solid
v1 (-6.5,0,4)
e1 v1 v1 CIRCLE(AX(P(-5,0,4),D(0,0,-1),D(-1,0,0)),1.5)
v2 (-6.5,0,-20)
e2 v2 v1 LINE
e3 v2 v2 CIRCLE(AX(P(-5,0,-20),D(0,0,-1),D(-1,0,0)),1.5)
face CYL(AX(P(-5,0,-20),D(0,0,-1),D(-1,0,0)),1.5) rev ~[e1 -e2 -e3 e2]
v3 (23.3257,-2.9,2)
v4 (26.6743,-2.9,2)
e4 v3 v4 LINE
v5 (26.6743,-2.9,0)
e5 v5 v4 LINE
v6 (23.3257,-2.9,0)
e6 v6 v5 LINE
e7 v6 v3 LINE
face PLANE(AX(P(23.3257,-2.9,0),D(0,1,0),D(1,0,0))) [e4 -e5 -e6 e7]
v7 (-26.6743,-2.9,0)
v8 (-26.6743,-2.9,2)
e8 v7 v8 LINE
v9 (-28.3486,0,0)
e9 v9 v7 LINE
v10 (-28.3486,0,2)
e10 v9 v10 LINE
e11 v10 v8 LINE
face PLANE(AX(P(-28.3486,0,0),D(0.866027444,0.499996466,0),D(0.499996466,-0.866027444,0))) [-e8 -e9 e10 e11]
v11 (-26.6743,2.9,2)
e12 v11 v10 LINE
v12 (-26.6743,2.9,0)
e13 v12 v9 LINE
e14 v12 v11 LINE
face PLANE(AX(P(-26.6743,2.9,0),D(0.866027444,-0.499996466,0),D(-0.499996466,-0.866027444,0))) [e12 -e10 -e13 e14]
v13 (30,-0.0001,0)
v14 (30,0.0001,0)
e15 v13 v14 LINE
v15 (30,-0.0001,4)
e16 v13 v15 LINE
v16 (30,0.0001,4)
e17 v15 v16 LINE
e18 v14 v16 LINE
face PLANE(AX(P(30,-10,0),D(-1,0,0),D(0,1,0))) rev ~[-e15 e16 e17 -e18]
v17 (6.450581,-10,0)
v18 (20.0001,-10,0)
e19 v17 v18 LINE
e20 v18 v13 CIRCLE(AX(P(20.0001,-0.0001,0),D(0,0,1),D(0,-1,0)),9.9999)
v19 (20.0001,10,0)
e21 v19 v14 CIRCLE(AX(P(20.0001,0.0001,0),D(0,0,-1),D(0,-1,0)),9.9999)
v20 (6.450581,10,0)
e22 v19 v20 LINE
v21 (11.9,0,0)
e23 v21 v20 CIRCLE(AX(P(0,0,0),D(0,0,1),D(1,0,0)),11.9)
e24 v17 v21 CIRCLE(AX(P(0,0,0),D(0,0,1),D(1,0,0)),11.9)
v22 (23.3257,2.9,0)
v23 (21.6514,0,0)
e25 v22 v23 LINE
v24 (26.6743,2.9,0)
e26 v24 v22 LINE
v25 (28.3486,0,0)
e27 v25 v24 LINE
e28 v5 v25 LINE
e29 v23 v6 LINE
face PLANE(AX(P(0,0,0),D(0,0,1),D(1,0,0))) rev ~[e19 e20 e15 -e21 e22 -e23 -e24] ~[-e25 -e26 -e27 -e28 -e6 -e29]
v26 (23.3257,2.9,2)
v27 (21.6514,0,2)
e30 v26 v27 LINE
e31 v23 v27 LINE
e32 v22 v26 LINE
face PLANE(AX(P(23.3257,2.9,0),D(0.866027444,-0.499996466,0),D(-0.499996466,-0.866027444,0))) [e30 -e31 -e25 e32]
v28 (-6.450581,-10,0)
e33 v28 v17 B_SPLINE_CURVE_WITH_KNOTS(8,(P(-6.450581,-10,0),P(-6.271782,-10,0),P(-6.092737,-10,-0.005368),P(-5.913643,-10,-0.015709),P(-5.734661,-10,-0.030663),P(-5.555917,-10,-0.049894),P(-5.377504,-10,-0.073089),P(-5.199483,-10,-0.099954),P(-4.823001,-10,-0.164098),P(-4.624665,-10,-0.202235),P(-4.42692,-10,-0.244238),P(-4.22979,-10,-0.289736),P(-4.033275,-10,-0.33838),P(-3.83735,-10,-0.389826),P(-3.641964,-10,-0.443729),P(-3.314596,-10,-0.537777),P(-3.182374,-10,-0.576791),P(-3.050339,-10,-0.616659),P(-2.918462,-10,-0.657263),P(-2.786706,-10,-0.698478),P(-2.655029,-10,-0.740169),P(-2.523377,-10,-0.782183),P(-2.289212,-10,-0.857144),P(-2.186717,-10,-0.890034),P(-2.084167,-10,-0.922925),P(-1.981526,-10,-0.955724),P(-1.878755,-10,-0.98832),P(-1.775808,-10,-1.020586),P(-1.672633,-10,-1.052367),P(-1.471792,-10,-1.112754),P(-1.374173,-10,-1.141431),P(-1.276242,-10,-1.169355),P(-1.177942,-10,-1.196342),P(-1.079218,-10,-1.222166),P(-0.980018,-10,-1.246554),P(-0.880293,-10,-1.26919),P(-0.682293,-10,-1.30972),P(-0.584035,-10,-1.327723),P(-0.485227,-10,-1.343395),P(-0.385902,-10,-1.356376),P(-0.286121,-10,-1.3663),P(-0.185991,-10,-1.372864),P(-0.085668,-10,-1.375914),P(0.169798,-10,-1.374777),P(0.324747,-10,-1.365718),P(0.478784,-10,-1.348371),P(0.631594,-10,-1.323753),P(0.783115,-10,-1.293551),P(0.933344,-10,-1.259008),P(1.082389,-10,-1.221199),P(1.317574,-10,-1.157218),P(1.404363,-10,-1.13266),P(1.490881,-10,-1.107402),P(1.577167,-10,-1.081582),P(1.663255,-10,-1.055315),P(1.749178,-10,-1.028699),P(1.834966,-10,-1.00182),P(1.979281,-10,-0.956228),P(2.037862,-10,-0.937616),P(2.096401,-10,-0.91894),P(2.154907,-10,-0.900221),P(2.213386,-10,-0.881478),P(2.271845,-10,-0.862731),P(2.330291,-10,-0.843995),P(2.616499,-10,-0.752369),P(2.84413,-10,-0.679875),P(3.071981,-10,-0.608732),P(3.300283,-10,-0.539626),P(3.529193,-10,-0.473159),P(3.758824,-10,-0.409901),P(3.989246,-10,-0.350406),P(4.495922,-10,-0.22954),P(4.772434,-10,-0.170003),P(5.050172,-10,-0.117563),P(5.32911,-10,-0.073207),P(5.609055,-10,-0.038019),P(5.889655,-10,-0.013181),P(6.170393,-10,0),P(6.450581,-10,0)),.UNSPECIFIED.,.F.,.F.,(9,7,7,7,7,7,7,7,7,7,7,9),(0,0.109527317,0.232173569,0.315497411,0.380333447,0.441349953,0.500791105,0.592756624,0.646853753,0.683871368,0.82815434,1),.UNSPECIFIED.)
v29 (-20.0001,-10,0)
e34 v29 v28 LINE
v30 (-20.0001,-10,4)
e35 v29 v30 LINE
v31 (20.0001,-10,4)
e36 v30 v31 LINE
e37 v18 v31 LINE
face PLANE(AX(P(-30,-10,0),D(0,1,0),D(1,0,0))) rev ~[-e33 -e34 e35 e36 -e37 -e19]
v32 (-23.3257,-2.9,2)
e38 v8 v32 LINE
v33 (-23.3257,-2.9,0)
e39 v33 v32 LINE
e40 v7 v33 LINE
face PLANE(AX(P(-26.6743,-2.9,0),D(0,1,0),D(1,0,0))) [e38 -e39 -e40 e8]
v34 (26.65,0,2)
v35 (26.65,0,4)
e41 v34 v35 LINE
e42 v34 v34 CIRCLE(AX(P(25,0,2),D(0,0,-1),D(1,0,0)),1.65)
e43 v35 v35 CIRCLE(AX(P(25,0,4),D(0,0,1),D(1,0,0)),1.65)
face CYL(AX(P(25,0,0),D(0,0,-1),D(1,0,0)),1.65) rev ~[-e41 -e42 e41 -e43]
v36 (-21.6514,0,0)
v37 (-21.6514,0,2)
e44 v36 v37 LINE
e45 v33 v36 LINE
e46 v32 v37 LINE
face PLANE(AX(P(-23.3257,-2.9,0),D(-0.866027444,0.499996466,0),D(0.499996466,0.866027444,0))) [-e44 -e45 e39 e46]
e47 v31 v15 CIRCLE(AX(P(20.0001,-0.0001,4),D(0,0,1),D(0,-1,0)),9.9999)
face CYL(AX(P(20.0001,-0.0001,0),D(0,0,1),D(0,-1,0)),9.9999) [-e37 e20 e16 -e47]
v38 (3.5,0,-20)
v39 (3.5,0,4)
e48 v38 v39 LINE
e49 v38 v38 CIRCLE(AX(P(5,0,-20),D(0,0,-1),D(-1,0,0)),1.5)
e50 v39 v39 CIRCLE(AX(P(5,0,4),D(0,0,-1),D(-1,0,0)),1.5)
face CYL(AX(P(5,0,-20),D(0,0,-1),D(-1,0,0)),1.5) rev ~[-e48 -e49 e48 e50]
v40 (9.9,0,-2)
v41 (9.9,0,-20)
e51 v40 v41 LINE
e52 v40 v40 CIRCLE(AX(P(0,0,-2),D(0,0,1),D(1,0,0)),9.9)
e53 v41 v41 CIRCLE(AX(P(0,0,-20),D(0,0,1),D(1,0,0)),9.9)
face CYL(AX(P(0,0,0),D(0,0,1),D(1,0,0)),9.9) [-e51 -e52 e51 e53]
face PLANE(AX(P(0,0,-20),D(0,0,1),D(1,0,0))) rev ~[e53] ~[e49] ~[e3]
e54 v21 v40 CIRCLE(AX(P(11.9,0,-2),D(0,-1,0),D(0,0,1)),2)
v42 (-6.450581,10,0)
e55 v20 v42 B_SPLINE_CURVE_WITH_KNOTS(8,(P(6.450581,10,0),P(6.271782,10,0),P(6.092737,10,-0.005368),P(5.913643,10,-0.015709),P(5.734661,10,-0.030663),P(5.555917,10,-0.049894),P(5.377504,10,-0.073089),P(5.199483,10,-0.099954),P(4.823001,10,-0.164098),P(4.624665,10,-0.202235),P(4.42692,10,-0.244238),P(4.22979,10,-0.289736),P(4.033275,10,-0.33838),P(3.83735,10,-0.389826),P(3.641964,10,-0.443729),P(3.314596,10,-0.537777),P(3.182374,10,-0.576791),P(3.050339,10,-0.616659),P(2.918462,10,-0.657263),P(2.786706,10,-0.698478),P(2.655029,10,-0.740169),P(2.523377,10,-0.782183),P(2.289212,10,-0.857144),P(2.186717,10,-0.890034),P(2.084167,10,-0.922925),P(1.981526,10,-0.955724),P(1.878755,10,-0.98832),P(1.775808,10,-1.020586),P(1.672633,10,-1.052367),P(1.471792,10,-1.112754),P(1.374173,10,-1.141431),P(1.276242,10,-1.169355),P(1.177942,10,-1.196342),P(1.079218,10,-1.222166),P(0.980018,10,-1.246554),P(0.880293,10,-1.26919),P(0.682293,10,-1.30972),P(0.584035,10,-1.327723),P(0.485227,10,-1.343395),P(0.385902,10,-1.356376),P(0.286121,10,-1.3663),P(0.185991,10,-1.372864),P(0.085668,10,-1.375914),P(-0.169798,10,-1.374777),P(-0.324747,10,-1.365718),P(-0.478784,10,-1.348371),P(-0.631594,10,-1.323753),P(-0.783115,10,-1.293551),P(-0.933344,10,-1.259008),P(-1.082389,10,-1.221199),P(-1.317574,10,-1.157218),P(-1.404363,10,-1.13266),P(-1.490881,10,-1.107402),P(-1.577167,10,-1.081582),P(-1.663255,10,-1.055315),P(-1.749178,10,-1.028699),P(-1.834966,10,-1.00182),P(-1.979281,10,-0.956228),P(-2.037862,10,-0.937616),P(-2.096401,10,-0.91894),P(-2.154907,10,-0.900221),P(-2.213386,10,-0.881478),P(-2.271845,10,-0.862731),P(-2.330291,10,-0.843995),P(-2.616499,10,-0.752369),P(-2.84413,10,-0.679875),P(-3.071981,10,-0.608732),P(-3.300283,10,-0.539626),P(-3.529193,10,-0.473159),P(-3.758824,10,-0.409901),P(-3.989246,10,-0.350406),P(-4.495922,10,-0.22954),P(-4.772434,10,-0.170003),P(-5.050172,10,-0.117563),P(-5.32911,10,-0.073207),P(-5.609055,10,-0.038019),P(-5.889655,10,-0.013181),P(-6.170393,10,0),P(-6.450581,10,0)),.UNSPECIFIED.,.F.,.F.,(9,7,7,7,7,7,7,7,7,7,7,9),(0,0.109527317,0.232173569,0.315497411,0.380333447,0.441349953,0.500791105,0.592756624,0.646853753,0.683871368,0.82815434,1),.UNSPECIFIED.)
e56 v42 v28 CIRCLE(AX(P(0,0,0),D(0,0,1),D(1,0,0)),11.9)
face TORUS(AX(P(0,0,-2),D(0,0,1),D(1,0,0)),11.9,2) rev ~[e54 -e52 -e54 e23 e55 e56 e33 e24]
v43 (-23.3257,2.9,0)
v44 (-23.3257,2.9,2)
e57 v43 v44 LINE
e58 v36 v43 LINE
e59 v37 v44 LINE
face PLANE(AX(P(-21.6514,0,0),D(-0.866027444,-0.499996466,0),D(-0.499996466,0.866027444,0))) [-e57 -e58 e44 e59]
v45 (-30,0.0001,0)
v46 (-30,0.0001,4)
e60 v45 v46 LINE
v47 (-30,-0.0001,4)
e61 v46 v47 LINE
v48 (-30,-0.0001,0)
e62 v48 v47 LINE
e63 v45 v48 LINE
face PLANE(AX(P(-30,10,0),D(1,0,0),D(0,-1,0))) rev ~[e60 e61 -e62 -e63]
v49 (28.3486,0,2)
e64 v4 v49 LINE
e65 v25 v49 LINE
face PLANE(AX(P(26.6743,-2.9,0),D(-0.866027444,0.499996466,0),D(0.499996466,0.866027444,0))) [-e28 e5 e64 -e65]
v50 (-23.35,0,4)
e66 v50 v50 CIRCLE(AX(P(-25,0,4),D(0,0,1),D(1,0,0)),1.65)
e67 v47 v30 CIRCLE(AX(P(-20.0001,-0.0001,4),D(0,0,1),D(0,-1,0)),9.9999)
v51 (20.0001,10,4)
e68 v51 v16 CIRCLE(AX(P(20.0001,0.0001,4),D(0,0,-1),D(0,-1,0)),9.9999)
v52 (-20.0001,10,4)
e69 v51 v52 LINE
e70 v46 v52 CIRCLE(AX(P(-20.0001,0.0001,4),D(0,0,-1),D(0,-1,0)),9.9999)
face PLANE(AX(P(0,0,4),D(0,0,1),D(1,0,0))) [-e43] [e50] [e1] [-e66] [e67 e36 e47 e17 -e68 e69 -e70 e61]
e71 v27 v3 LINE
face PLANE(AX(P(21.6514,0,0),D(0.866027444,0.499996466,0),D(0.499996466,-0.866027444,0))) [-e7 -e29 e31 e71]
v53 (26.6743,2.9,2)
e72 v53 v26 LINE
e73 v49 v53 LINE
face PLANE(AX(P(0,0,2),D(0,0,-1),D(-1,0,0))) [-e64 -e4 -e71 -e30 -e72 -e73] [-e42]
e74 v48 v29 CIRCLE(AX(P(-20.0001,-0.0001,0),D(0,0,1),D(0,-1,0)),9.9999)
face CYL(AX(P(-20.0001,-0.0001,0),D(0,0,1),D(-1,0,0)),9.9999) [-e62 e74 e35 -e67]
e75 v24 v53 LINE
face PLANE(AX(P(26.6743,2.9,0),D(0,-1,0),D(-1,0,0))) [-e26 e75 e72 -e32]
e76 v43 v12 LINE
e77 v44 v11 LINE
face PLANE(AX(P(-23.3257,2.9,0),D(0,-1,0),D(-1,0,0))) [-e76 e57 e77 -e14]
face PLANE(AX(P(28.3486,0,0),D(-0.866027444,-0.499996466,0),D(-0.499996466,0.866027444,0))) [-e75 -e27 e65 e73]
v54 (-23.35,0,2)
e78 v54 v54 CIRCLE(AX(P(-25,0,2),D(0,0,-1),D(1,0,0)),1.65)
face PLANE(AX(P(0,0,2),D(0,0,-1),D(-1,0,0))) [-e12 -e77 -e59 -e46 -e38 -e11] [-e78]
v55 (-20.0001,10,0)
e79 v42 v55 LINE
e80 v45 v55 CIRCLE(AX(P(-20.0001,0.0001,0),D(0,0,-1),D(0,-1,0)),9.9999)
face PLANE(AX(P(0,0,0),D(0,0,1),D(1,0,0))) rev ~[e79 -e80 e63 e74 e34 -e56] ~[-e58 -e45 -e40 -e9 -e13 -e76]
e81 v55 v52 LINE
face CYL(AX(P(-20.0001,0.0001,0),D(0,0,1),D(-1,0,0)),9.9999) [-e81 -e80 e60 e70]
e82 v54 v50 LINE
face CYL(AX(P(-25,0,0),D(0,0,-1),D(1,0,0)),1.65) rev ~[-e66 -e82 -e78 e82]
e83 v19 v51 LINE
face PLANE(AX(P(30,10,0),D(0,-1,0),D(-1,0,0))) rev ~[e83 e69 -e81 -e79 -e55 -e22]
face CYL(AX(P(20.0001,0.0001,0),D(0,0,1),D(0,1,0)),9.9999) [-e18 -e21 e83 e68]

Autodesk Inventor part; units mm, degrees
ref_plane "YZ Plane" through (0, 0, 0) normal (1, 0, 0) x (0, 1, 0)
ref_plane "XZ Plane" through (0, 0, 0) normal (0, 1, 0) x (-1, 0, 0)
ref_plane "XY Plane" through (0, 0, 0) normal (0, 0, 1) x (1, 0, 0)
sketch "Sketch1" plane through (0, 0, 0) normal (0, 0, 1) x (1, 0, 0)
  line L0 (-30, -10) -> (30, -10)
  line L1 (30, -10) -> (30, 10)
  line L2 (30, 10) -> (-30, 10)
  line L3 (-30, 10) -> (-30, -10)
  line L4 (-30, -10) -> (30, 10) construction
  line L5 (30, -10) -> (-30, 10) construction
  circle A0 centre (0, 0) radius 9.9
  circle A1 centre (-25, 0) radius 1.65
  circle A2 centre (25, 0) radius 1.65
  line L6 (-25, 0) -> (25, 0) construction
  point P0 (-30, 0)
  dimension "d0" = 60
  dimension "d1" = 19.8
  dimension "d2" = 20
  dimension "d3" = 50
  dimension "d4" = 3.3
extrude "Extrusion1" add sketch "Sketch1" along normal blind 4 contours L3 L2 L1 L0 | A0
extrude "Extrusion2" add sketch "Sketch1" against normal blind 20 contours A0
fillet "Fillet1" radius 2 1 edges at (-9.9, 0, 0)
fillet "Fillet2" radius 10 4 edges at (30, 10, 2) (30, -10, 2) (-30, 10, 2) (-30, -10, 2)
sketch "Sketch2" plane through (0, 0, 0) normal (0, 0, -1) x (-1, 0, 0)
  arc A0 (-20, 10) -> (-20, -10) centre (-20, 0) ccw projected
  line L0 (-6.4506, -10) -> (-20, -10) projected
  arc A1 (-6.4506, 10) -> (-6.4506, -10) centre (0, 0) ccw projected
  line L1 (-20, 10) -> (-6.4506, 10) projected
  circle A2 centre (-25, 0) radius 1.65 projected
  line L2 (25, 0) -> (-25, 0) construction
  line L3 (-23.3257, -2.9) -> (-26.6743, -2.9)
  line L4 (-26.6743, -2.9) -> (-28.3486, 0)
  line L5 (-28.3486, 0) -> (-26.6743, 2.9)
  line L6 (-26.6743, 2.9) -> (-23.3257, 2.9)
  line L7 (-23.3257, 2.9) -> (-21.6514, 0)
  line L8 (-21.6514, 0) -> (-23.3257, -2.9)
  circle A3 centre (25, 0) radius 1.65 projected
  line L9 (23.3257, 2.9) -> (26.6743, 2.9)
  line L10 (26.6743, 2.9) -> (28.3486, 0)
  line L11 (28.3486, 0) -> (26.6743, -2.9)
  line L12 (26.6743, -2.9) -> (23.3257, -2.9)
  line L13 (23.3257, -2.9) -> (21.6514, 0)
  line L14 (21.6514, 0) -> (23.3257, 2.9)
  point P0 (25, 2.9)
  dimension "d11" = 5.8
  dimension "d12" = 5.8
extrude "Extrusion3" cut sketch "Sketch2" against normal blind 2 contours L3 L4 L5 L6 L7 L8 | L9 L10 L11 L12 L13 L14
sketch "Sketch3" plane through (0, 0, -20) normal (0, 0, -1) x (-1, 0, 0)
  circle A0 centre (0, 0) radius 9.9 projected
  circle A1 centre (-5, 0) radius 1.5
  line L0 (0, 0) -> (0, 2.4769)
  circle A2 centre (5, 0) radius 1.5
  dimension "d15" = 3
  dimension "d16" = 10
extrude "Extrusion4" cut sketch "Sketch3" against normal through all contours A1 | A2
properties part number "GIRO_1" material "Steel, Mild, Welded"
